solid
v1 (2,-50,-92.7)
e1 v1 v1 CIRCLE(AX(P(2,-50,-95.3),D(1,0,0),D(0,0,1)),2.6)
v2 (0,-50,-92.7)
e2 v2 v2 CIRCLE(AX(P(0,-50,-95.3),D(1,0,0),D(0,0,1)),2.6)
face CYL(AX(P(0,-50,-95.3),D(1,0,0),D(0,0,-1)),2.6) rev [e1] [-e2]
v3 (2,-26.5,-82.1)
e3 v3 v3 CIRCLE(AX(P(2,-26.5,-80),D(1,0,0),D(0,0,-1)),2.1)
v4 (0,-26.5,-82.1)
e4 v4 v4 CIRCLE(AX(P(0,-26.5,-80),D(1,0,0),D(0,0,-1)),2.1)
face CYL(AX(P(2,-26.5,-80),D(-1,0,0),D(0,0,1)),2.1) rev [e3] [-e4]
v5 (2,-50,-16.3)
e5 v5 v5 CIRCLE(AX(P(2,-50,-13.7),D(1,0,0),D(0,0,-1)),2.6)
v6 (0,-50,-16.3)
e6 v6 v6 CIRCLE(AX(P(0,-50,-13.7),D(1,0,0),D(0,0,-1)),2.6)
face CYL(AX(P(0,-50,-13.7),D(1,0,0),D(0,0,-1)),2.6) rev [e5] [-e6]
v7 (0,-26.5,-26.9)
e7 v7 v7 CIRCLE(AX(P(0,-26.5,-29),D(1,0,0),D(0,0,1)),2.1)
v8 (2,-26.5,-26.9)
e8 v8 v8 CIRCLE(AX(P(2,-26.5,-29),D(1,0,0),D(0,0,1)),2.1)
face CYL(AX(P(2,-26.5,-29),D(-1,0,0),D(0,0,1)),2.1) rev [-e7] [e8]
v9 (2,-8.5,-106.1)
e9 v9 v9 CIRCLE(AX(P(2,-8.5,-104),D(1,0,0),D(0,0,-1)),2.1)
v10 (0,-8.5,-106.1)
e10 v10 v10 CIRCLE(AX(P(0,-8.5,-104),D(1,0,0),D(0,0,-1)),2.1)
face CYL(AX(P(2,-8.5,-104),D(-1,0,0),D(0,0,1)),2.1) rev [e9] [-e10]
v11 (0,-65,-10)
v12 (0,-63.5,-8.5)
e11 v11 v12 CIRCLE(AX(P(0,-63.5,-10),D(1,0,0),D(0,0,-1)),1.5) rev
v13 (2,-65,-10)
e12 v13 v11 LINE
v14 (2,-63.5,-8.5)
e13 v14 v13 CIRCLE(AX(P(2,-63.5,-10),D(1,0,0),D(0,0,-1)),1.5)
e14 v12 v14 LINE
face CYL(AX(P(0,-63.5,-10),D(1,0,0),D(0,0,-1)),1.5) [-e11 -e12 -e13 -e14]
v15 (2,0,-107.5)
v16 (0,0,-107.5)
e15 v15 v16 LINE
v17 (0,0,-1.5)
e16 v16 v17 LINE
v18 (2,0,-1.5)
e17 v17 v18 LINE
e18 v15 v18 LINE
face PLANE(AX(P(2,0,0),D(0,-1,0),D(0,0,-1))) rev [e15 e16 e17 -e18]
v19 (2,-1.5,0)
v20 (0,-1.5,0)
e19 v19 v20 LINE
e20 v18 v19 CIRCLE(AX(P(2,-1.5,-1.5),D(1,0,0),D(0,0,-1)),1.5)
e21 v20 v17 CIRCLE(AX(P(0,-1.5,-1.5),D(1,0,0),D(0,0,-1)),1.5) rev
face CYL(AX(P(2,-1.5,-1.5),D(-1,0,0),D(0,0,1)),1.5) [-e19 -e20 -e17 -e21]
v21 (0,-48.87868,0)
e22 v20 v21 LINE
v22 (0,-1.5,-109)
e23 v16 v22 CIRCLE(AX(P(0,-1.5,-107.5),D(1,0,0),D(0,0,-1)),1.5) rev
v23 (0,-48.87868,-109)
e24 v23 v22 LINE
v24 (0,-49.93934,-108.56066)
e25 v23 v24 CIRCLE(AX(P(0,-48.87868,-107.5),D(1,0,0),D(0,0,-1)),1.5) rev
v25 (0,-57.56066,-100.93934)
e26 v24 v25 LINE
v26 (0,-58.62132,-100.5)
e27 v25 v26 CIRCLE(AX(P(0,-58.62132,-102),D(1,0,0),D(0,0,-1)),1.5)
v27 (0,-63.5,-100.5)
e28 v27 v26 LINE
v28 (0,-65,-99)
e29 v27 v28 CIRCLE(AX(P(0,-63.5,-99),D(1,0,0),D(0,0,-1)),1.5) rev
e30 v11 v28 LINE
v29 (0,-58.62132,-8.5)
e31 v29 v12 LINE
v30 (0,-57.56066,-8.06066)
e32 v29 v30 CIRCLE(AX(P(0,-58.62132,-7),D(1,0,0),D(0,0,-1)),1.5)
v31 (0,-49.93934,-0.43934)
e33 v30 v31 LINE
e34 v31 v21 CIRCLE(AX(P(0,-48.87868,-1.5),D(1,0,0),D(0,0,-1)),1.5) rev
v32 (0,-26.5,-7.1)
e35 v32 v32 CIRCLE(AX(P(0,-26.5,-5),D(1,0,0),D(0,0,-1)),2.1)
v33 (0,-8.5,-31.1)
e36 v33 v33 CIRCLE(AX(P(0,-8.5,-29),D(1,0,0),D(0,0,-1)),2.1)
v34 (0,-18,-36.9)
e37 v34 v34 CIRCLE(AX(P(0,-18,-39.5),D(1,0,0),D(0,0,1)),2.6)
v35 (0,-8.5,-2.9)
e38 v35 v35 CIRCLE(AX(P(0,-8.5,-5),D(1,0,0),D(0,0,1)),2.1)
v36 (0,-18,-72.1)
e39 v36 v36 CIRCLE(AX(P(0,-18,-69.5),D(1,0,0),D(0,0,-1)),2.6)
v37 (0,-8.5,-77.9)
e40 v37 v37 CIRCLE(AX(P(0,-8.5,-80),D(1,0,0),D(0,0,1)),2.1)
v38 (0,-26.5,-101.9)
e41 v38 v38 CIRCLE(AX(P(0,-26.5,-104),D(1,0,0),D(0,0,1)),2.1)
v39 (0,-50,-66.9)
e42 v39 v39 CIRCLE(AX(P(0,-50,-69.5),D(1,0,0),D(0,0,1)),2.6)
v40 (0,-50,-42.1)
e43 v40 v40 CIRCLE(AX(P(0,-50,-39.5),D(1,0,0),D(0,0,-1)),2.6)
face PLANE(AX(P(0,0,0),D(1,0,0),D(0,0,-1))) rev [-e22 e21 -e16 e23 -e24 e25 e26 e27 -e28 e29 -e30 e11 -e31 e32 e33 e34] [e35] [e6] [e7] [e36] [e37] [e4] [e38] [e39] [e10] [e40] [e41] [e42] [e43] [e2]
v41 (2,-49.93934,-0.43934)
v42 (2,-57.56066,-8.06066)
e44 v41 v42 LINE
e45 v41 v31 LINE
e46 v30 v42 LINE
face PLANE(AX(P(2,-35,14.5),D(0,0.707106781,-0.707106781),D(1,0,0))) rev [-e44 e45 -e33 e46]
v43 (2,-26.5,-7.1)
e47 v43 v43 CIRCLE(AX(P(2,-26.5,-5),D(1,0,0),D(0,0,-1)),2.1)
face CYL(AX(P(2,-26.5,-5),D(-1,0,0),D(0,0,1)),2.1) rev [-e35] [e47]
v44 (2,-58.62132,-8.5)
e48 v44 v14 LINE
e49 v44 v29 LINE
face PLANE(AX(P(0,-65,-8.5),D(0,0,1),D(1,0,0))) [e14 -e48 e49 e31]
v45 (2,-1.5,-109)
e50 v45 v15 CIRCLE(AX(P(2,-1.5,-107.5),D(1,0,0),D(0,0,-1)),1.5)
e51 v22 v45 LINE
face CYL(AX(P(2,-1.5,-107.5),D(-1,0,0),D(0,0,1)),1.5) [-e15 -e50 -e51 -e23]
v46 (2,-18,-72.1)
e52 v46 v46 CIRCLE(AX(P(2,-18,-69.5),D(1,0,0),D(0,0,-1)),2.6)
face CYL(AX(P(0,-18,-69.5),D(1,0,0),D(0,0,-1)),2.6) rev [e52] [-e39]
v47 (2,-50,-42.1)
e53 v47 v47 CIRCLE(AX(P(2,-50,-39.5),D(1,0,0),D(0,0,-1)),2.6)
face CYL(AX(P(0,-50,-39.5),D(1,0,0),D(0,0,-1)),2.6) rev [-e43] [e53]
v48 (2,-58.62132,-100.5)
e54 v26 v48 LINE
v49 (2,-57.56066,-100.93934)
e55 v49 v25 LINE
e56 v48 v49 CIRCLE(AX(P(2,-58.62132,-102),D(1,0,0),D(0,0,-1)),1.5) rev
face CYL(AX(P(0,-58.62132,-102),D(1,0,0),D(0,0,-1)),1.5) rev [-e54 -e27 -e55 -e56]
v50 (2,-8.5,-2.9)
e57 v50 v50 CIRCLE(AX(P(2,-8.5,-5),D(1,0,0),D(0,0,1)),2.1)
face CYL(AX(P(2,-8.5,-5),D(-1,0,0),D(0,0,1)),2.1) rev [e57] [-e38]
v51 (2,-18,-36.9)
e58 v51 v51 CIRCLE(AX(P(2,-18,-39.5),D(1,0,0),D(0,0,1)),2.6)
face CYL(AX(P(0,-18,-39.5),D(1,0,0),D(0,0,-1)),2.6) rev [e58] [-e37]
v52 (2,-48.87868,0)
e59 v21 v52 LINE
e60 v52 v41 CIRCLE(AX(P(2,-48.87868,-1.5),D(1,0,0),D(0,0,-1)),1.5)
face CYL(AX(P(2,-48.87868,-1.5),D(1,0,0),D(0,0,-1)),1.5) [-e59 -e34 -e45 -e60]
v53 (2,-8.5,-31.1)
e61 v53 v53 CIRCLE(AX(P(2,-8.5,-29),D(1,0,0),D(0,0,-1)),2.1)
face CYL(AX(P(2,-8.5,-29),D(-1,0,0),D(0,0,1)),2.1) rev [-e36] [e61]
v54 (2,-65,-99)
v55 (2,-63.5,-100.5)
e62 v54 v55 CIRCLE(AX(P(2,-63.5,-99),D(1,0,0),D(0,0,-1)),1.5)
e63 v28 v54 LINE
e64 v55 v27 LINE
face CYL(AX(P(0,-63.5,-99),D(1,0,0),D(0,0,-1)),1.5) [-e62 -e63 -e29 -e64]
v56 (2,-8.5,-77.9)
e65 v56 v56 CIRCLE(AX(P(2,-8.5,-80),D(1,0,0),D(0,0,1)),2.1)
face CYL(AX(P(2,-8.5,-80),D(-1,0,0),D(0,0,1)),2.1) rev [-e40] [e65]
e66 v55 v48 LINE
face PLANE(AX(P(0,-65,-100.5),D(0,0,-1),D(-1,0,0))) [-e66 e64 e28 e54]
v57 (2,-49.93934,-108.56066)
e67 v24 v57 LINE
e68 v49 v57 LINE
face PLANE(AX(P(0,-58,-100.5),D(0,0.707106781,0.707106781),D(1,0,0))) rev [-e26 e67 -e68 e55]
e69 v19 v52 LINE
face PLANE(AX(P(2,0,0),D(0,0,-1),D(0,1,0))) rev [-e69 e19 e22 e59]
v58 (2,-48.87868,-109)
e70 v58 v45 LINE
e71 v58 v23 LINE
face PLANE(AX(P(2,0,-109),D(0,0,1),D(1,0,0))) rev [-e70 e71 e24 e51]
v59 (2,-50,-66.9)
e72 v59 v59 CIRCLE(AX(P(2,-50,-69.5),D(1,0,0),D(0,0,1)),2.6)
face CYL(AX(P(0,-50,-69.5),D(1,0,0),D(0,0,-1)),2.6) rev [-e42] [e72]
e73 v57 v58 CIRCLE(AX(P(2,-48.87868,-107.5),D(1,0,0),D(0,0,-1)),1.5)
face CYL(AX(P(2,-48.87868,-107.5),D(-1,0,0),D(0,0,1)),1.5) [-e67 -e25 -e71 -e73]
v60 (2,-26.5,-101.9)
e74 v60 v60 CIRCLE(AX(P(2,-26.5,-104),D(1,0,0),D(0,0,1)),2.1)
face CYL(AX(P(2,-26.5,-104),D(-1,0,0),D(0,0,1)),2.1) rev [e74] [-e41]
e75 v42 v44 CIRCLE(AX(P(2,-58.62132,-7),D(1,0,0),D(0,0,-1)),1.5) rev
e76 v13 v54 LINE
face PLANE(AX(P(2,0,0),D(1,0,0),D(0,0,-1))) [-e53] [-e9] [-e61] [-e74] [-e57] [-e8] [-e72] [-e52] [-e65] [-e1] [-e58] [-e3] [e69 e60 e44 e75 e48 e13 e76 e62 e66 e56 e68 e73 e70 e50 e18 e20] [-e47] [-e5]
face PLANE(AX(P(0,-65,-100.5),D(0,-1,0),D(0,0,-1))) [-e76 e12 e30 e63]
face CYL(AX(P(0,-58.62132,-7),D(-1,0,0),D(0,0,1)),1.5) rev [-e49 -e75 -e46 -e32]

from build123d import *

# Parameters (mm, degrees)
SKETCH1_W           = 109
SKETCH1_H           = 35
SKETCH1_R           = 2.1
BOSS_EXTRUDE1_DEPTH = 2
SKETCH2_W           = 92
SKETCH2_H           = 30
BOSS_EXTRUDE2_DEPTH = 2
SKETCH3_R           = 2.6
CUT_EXTRUDE1_DEPTH  = 127.925174808
CHAMFER1_SIZE       = 23
FILLET1_R           = 1.5


with BuildPart() as part:
    # Sketch1 → Boss-Extrude1 (new body)
    with BuildSketch(Plane(origin=(0, 0, 0), x_dir=(0, 0, -1), z_dir=(1, 0, 0))):
        with Locations((54.5, -17.5)):
            Rectangle(SKETCH1_W, SKETCH1_H)
        with Locations((104, -8.5)):
            Circle(SKETCH1_R, mode=Mode.SUBTRACT)
        with Locations(Location((104, -26.5, 0), (0, 0, 180))):
            Circle(SKETCH1_R, mode=Mode.SUBTRACT)
        with Locations((80, -26.5)):
            Circle(SKETCH1_R, mode=Mode.SUBTRACT)
        with Locations(Location((80, -8.5, 0), (0, 0, 180))):
            Circle(SKETCH1_R, mode=Mode.SUBTRACT)
        with Locations((5, -26.5)):
            Circle(SKETCH1_R, mode=Mode.SUBTRACT)
        with Locations(Location((5, -8.5, 0), (0, 0, 180))):
            Circle(SKETCH1_R, mode=Mode.SUBTRACT)
        with Locations(Location((29, -26.5, 0), (0, 0, 180))):
            Circle(SKETCH1_R, mode=Mode.SUBTRACT)
        with Locations((29, -8.5)):
            Circle(SKETCH1_R, mode=Mode.SUBTRACT)
    extrude(amount=BOSS_EXTRUDE1_DEPTH)

    # Sketch2 → Boss-Extrude2 (add)
    with BuildSketch(Plane(origin=(2, 0, 0), x_dir=(0, 0, -1), z_dir=(1, 0, 0))):
        with Locations((54.5, -50)):
            Rectangle(SKETCH2_W, SKETCH2_H)
    extrude(amount=-BOSS_EXTRUDE2_DEPTH)

    # Sketch3 → Cut-Extrude1 (cut, through all)
    with BuildSketch(Plane(origin=(2, 0, 0), x_dir=(0, 0, -1), z_dir=(1, 0, 0))):
        with Locations((13.7, -50)):
            Circle(SKETCH3_R)
        with Locations((39.5, -50)):
            Circle(SKETCH3_R)
        with Locations(Location((95.3, -50, 0), (0, 0, 180))):
            Circle(SKETCH3_R)
        with Locations(Location((69.5, -50, 0), (0, 0, 180))):
            Circle(SKETCH3_R)
        with Locations((69.5, -18)):
            Circle(SKETCH3_R)
        with Locations(Location((39.5, -18, 0), (0, 0, 180))):
            Circle(SKETCH3_R)
    extrude(amount=-CUT_EXTRUDE1_DEPTH, mode=Mode.SUBTRACT)

    # Chamfer1
    # the kernel refuses this chamfer: 23 mm, written as the material it adds along each edge
    with BuildSketch(Plane(origin=(2, -35, -100.5), x_dir=(0, 0.027495876610586077, -0.9996219169112968), z_dir=(-1, 0, 0))) as chamfer1_piece_1_section:
        Polygon((CHAMFER1_SIZE * 0.999621916911, CHAMFER1_SIZE * 0.0274958766106), (-CHAMFER1_SIZE * 0.0274958766106, CHAMFER1_SIZE * 0.999621916911), (0, 0), align=None)
    chamfer1_piece_1 = extrude(amount=2, mode=Mode.PRIVATE)
    chamfer1_piece_1 = split(chamfer1_piece_1, bisect_by=Plane(origin=(1, -44.672301489, -109), z_dir=(0, 0, 1)), keep=Keep.TOP, mode=Mode.PRIVATE)
    add(chamfer1_piece_1)
    with BuildSketch(Plane(origin=(2, -35, -8.5), x_dir=(0, 0.02749587661058667, 0.9996219169112968), z_dir=(-1, 0, 0))) as chamfer1_piece_2_section:
        Polygon((CHAMFER1_SIZE * 0.999621916911, -CHAMFER1_SIZE * 0.0274958766106), (-CHAMFER1_SIZE * 0.0274958766106, -CHAMFER1_SIZE * 0.999621916911), (0, 0), align=None)
    chamfer1_piece_2 = extrude(amount=2, mode=Mode.PRIVATE)
    chamfer1_piece_2 = split(chamfer1_piece_2, bisect_by=Plane(origin=(1, -44.672301489, 0), z_dir=(0, 0, -1)), keep=Keep.TOP, mode=Mode.PRIVATE)
    add(chamfer1_piece_2)

    # Fillet1
    fillet1_edges = [part.edges().sort_by_distance(p)[0] for p in [
        (1, -65, -8.5),
        (1, -65, -100.5),
        (1, 0, 0),
        (1, 0, -109),
        (1, -58, -8.5),
        (1, -58, -100.5),
        (1, -49.5, 0),
        (1, -49.5, -109),
    ]]
    fillet(fillet1_edges, radius=FILLET1_R)


solid = part.part
